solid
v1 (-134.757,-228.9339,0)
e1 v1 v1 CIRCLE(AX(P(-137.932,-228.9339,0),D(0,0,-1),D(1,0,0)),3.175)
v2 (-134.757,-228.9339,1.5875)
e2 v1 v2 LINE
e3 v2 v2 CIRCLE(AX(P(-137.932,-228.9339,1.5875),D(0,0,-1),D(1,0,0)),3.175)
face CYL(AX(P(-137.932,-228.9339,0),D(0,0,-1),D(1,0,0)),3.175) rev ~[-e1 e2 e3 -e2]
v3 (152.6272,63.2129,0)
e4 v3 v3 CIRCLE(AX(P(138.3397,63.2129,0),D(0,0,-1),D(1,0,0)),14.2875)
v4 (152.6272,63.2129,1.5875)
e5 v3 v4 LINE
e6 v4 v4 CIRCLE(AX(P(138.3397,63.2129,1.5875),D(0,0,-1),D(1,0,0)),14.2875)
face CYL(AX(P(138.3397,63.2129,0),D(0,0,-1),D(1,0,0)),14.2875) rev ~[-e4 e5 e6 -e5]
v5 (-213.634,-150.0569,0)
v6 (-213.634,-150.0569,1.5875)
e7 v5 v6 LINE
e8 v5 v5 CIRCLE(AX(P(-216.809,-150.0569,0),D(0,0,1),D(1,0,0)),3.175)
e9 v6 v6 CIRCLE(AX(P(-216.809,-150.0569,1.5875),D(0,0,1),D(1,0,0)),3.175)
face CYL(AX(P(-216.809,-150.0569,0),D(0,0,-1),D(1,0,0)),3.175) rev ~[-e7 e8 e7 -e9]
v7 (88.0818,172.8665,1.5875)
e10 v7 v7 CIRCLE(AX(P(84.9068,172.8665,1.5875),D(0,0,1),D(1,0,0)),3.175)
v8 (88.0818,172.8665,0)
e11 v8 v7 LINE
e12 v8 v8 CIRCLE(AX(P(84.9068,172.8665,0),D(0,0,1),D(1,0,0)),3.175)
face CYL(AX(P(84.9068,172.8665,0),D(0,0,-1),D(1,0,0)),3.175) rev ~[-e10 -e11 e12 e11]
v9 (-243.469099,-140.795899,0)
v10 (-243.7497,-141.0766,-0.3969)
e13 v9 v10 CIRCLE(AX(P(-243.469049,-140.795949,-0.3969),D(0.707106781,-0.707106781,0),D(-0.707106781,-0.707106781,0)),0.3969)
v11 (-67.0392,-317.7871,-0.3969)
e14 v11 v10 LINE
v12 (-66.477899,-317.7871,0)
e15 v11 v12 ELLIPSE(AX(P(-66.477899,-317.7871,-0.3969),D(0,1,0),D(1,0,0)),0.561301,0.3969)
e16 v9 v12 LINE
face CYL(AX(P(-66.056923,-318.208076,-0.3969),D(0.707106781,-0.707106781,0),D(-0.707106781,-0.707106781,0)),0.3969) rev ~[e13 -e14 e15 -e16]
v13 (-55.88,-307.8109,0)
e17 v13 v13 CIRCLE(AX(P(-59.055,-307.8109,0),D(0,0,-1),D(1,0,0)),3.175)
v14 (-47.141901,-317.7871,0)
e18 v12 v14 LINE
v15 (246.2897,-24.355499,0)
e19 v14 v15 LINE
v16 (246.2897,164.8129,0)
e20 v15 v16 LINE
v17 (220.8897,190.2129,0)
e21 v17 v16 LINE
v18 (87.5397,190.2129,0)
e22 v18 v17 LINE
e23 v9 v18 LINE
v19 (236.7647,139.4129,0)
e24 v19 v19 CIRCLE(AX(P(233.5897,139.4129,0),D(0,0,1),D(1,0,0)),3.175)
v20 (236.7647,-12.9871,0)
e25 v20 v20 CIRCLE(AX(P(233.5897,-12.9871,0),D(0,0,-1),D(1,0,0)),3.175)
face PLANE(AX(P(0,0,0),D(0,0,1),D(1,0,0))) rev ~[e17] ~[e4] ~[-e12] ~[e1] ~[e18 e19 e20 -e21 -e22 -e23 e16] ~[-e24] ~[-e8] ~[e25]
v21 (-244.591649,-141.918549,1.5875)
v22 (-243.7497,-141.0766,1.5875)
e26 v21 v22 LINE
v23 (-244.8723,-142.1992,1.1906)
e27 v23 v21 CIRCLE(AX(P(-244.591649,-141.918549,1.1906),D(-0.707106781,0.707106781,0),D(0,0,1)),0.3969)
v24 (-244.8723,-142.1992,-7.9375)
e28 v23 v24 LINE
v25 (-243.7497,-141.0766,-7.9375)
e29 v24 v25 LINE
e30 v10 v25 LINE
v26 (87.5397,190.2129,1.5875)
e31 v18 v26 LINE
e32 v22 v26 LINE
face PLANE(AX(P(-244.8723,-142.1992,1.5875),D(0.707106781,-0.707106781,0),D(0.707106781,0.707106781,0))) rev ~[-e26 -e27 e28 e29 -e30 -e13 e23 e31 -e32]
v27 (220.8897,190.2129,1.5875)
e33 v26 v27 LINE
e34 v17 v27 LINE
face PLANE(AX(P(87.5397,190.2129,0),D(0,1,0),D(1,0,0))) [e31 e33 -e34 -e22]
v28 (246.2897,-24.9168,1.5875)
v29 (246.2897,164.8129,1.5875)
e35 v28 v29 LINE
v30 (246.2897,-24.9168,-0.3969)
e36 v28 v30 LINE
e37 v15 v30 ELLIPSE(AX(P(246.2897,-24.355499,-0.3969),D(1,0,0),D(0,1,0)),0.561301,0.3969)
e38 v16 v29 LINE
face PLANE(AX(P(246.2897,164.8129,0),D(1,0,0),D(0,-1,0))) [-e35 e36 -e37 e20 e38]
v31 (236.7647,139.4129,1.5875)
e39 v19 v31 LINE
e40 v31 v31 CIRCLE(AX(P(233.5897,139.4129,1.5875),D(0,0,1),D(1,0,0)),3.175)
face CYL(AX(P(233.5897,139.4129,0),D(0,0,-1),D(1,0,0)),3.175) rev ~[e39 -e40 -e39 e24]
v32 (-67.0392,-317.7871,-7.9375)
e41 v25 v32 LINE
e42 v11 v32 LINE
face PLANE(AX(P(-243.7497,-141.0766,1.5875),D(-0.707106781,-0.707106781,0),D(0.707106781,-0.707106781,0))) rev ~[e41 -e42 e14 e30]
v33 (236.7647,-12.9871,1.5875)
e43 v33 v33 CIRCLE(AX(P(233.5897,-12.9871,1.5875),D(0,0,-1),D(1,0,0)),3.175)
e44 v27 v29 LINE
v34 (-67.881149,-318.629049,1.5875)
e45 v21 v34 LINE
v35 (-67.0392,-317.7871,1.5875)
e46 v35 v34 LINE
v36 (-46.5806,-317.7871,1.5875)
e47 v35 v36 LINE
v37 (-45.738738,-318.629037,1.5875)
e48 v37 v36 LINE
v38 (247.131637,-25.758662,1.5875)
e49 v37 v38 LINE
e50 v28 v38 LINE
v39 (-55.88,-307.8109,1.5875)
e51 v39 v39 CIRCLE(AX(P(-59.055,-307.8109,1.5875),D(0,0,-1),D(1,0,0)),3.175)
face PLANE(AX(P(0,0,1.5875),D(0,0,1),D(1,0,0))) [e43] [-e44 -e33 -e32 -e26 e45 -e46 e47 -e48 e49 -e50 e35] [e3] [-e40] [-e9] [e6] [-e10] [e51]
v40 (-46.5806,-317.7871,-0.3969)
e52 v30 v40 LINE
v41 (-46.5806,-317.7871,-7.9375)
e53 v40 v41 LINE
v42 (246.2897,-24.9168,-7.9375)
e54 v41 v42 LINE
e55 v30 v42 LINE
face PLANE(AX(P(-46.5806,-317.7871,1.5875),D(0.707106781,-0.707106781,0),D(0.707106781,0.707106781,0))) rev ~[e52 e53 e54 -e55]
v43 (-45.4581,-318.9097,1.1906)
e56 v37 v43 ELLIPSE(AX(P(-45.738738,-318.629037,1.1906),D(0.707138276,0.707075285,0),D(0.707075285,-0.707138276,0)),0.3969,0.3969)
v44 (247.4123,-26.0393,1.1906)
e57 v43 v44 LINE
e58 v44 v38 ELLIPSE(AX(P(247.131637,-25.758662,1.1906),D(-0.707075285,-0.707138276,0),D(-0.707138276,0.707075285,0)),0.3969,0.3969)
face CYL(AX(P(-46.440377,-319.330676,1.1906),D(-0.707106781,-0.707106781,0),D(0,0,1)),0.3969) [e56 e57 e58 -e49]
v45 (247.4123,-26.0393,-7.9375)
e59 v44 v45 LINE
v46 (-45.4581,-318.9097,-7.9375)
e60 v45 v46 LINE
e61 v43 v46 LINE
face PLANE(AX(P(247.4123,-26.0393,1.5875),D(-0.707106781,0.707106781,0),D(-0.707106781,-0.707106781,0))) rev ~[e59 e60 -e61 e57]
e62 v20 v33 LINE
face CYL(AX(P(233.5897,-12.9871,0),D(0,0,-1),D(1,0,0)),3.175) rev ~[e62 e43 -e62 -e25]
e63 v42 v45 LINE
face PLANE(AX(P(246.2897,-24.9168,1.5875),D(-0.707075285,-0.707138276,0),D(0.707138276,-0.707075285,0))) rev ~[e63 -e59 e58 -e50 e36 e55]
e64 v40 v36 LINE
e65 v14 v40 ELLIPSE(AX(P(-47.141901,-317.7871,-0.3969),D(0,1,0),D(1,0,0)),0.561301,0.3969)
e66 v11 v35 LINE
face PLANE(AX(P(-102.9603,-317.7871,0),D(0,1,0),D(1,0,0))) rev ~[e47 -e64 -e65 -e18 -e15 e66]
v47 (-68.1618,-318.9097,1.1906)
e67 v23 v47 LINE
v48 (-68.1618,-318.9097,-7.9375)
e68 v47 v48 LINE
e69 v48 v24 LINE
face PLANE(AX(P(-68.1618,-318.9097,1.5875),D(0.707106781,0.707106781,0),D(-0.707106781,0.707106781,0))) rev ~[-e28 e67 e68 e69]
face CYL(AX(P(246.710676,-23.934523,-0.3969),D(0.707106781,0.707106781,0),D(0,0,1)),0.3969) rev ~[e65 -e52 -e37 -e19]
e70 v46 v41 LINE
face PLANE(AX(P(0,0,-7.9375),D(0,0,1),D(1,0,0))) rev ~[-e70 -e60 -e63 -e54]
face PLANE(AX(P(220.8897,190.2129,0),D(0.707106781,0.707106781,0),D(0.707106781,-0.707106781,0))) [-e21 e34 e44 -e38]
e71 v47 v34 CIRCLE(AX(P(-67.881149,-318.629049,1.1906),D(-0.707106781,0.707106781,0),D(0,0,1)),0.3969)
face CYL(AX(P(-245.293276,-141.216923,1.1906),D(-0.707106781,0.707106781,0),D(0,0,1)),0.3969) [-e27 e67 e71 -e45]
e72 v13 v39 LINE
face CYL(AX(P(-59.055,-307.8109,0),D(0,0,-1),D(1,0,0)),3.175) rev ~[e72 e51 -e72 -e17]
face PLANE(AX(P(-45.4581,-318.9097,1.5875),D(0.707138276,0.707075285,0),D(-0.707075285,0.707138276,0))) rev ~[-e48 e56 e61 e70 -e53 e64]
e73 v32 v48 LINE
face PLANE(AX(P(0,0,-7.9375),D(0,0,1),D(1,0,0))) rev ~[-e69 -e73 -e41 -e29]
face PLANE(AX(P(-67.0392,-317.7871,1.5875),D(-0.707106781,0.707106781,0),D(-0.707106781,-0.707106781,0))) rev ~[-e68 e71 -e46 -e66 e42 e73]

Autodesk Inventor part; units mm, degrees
ref_plane "YZ Plane" through (0, 0, 0) normal (1, 0, 0) x (0, 1, 0)
ref_plane "XZ Plane" through (0, 0, 0) normal (0, 1, 0) x (-1, 0, 0)
ref_plane "XY Plane" through (0, 0, 0) normal (0, 0, 1) x (1, 0, 0)
sketch "Sketch1" plane through (0, 0, 0) normal (0, 0, 1) x (1, 0, 0)
  line L0 (220.8897, 190.2129) -> (246.2897, 164.8129)
  line L1 (246.2897, 164.8129) -> (246.2897, -38.3871)
  line L2 (246.2897, -38.3871) -> (-33.1103, -317.7871)
  line L3 (-102.9603, -317.7871) -> (-261.7103, -159.0371)
  line L4 (-261.7103, -159.0371) -> (87.5397, 190.2129)
  circle A0 centre (233.5897, -12.9871) radius 3.175
  circle A1 centre (233.5897, 139.4129) radius 3.175
  circle A2 centre (84.9068, 172.8665) radius 3.175
  line L5 (84.9068, 172.8665) -> (233.5897, 139.4129) construction
  line L6 (233.5897, 139.4129) -> (233.5897, -12.9871) construction
  line L7 (-102.9603, -317.7871) -> (-33.1103, -317.7871)
  circle A3 centre (138.3397, 63.2129) radius 14.2875
  line L8 (84.9068, 172.8665) -> (138.3397, 63.2129) construction
  line L9 (138.3397, 63.2129) -> (233.5897, 139.4129) construction
  line L10 (138.3397, 63.2129) -> (233.5897, -12.9871) construction
  circle A4 centre (-59.055, -307.8109) radius 3.175
  circle A5 centre (-216.809, -150.0569) radius 3.175
  circle A6 centre (-137.932, -228.9339) radius 3.175
  line L11 (87.5397, 190.2129) -> (220.8897, 190.2129)
  line L12 (-216.809, -150.0569) -> (-137.932, -228.9339) construction
  line L13 (-137.932, -228.9339) -> (-59.055, -307.8109) construction
  point P0 (0, 0)
  dimension "d222" = 203.2
  dimension "d228" = 12.7
  dimension "d229" = 152.4
  dimension "d230" = 25.4
  dimension "d233" = 135
  dimension "d236" = 6.35
  dimension "d237" = 381
  dimension "d238" = 107.95
  dimension "d240" = 508
  dimension "d241" = 158.75
  dimension "d242" = 28.575
  dimension "d247" = 279.4
  dimension "d248" = 508
  dimension "d249" = 6.35
  dimension "d250" = 38.1
  dimension "d252" = 25.4
  dimension "d253" = 25.4
extrude "Extrusion14" add sketch "Sketch1" along normal blind 1.5875
sketch "Sketch12" plane through (0, 0, 1.5875) normal (0, 0, 1) x (1, 0, 0)
  line L0 (-33.1103, -317.7871) -> (-102.9603, -317.7871) projected
  line L1 (246.2897, -38.3871) -> (-33.1103, -317.7871) projected
  line L2 (246.2897, 164.8129) -> (246.2897, -38.3871) projected
  line L3 (220.8897, 190.2129) -> (246.2897, 164.8129) projected
  line L4 (-46.5806, -317.7871) -> (246.2897, -24.9168)
  line L5 (246.2897, -24.9168) -> (246.2897, -38.3871)
  line L6 (-33.1103, -317.7871) -> (246.2897, -38.3871)
  line L7 (-46.5806, -317.7871) -> (-33.1103, -317.7871)
  point P0 (0, 0)
  dimension "d254" = 9.525
extrude "Extrusion15" cut sketch "Sketch12" against normal up to next
sketch "Sketch13" plane through (0, 0, 1.5875) normal (0, 0, 1) x (1, 0, 0)
  line L0 (-46.5806, -317.7871) -> (246.2897, -24.9168) projected
  line L1 (-46.5806, -317.7871) -> (246.2897, -24.9168)
  line L2 (246.2897, -24.9168) -> (247.4123, -26.0393)
  line L3 (247.4123, -26.0393) -> (-45.4581, -318.9097)
  line L4 (-45.4581, -318.9097) -> (-46.5806, -317.7871)
  point P0 (0, 0)
  dimension "d257" = 1.5875
extrude "Extrusion16" add sketch "Sketch13" against normal blind 9.525
sketch "Sketch14" plane through (0, 0, 1.5875) normal (0, 0, 1) x (1, 0, 0)
  line L0 (-261.7103, -159.0371) -> (87.5397, 190.2129) projected
  line L1 (-102.9603, -317.7871) -> (-261.7103, -159.0371) projected
  line L2 (-46.5806, -317.7871) -> (-102.9603, -317.7871) projected
  line L3 (-261.7103, -159.0371) -> (-243.7497, -141.0766)
  line L4 (-243.7497, -141.0766) -> (-67.0392, -317.7871)
  line L5 (-67.0392, -317.7871) -> (-84.9997, -335.7476)
  line L6 (-84.9997, -335.7476) -> (-261.7103, -159.0371)
  point P0 (0, 0)
  dimension "d262" = 25.4
extrude "Extrusion17" cut sketch "Sketch14" against normal up to next contours L0 L4 L2 L1
sketch "Sketch15" plane through (0, 0, 1.5875) normal (0, 0, 1) x (1, 0, 0)
  line L0 (-243.7497, -141.0766) -> (-67.0392, -317.7871) projected
  line L1 (-243.7497, -141.0766) -> (-67.0392, -317.7871)
  line L2 (-67.0392, -317.7871) -> (-68.1618, -318.9097)
  line L3 (-68.1618, -318.9097) -> (-244.8723, -142.1992)
  line L4 (-244.8723, -142.1992) -> (-243.7497, -141.0766)
  point P0 (0, 0)
  dimension "d266" = 1.5875
extrude "Extrusion18" add sketch "Sketch15" against normal blind 9.525
fillet "Fillet1" radius 0.3969 4 edges at (-156.517, -230.5544, 1.5875) (99.8545, -171.3519, 0) (-155.3945, -229.4319, 0) (100.9771, -172.4745, 1.5875)
properties part number "Shooter Plate" material "Aluminum-6061"
